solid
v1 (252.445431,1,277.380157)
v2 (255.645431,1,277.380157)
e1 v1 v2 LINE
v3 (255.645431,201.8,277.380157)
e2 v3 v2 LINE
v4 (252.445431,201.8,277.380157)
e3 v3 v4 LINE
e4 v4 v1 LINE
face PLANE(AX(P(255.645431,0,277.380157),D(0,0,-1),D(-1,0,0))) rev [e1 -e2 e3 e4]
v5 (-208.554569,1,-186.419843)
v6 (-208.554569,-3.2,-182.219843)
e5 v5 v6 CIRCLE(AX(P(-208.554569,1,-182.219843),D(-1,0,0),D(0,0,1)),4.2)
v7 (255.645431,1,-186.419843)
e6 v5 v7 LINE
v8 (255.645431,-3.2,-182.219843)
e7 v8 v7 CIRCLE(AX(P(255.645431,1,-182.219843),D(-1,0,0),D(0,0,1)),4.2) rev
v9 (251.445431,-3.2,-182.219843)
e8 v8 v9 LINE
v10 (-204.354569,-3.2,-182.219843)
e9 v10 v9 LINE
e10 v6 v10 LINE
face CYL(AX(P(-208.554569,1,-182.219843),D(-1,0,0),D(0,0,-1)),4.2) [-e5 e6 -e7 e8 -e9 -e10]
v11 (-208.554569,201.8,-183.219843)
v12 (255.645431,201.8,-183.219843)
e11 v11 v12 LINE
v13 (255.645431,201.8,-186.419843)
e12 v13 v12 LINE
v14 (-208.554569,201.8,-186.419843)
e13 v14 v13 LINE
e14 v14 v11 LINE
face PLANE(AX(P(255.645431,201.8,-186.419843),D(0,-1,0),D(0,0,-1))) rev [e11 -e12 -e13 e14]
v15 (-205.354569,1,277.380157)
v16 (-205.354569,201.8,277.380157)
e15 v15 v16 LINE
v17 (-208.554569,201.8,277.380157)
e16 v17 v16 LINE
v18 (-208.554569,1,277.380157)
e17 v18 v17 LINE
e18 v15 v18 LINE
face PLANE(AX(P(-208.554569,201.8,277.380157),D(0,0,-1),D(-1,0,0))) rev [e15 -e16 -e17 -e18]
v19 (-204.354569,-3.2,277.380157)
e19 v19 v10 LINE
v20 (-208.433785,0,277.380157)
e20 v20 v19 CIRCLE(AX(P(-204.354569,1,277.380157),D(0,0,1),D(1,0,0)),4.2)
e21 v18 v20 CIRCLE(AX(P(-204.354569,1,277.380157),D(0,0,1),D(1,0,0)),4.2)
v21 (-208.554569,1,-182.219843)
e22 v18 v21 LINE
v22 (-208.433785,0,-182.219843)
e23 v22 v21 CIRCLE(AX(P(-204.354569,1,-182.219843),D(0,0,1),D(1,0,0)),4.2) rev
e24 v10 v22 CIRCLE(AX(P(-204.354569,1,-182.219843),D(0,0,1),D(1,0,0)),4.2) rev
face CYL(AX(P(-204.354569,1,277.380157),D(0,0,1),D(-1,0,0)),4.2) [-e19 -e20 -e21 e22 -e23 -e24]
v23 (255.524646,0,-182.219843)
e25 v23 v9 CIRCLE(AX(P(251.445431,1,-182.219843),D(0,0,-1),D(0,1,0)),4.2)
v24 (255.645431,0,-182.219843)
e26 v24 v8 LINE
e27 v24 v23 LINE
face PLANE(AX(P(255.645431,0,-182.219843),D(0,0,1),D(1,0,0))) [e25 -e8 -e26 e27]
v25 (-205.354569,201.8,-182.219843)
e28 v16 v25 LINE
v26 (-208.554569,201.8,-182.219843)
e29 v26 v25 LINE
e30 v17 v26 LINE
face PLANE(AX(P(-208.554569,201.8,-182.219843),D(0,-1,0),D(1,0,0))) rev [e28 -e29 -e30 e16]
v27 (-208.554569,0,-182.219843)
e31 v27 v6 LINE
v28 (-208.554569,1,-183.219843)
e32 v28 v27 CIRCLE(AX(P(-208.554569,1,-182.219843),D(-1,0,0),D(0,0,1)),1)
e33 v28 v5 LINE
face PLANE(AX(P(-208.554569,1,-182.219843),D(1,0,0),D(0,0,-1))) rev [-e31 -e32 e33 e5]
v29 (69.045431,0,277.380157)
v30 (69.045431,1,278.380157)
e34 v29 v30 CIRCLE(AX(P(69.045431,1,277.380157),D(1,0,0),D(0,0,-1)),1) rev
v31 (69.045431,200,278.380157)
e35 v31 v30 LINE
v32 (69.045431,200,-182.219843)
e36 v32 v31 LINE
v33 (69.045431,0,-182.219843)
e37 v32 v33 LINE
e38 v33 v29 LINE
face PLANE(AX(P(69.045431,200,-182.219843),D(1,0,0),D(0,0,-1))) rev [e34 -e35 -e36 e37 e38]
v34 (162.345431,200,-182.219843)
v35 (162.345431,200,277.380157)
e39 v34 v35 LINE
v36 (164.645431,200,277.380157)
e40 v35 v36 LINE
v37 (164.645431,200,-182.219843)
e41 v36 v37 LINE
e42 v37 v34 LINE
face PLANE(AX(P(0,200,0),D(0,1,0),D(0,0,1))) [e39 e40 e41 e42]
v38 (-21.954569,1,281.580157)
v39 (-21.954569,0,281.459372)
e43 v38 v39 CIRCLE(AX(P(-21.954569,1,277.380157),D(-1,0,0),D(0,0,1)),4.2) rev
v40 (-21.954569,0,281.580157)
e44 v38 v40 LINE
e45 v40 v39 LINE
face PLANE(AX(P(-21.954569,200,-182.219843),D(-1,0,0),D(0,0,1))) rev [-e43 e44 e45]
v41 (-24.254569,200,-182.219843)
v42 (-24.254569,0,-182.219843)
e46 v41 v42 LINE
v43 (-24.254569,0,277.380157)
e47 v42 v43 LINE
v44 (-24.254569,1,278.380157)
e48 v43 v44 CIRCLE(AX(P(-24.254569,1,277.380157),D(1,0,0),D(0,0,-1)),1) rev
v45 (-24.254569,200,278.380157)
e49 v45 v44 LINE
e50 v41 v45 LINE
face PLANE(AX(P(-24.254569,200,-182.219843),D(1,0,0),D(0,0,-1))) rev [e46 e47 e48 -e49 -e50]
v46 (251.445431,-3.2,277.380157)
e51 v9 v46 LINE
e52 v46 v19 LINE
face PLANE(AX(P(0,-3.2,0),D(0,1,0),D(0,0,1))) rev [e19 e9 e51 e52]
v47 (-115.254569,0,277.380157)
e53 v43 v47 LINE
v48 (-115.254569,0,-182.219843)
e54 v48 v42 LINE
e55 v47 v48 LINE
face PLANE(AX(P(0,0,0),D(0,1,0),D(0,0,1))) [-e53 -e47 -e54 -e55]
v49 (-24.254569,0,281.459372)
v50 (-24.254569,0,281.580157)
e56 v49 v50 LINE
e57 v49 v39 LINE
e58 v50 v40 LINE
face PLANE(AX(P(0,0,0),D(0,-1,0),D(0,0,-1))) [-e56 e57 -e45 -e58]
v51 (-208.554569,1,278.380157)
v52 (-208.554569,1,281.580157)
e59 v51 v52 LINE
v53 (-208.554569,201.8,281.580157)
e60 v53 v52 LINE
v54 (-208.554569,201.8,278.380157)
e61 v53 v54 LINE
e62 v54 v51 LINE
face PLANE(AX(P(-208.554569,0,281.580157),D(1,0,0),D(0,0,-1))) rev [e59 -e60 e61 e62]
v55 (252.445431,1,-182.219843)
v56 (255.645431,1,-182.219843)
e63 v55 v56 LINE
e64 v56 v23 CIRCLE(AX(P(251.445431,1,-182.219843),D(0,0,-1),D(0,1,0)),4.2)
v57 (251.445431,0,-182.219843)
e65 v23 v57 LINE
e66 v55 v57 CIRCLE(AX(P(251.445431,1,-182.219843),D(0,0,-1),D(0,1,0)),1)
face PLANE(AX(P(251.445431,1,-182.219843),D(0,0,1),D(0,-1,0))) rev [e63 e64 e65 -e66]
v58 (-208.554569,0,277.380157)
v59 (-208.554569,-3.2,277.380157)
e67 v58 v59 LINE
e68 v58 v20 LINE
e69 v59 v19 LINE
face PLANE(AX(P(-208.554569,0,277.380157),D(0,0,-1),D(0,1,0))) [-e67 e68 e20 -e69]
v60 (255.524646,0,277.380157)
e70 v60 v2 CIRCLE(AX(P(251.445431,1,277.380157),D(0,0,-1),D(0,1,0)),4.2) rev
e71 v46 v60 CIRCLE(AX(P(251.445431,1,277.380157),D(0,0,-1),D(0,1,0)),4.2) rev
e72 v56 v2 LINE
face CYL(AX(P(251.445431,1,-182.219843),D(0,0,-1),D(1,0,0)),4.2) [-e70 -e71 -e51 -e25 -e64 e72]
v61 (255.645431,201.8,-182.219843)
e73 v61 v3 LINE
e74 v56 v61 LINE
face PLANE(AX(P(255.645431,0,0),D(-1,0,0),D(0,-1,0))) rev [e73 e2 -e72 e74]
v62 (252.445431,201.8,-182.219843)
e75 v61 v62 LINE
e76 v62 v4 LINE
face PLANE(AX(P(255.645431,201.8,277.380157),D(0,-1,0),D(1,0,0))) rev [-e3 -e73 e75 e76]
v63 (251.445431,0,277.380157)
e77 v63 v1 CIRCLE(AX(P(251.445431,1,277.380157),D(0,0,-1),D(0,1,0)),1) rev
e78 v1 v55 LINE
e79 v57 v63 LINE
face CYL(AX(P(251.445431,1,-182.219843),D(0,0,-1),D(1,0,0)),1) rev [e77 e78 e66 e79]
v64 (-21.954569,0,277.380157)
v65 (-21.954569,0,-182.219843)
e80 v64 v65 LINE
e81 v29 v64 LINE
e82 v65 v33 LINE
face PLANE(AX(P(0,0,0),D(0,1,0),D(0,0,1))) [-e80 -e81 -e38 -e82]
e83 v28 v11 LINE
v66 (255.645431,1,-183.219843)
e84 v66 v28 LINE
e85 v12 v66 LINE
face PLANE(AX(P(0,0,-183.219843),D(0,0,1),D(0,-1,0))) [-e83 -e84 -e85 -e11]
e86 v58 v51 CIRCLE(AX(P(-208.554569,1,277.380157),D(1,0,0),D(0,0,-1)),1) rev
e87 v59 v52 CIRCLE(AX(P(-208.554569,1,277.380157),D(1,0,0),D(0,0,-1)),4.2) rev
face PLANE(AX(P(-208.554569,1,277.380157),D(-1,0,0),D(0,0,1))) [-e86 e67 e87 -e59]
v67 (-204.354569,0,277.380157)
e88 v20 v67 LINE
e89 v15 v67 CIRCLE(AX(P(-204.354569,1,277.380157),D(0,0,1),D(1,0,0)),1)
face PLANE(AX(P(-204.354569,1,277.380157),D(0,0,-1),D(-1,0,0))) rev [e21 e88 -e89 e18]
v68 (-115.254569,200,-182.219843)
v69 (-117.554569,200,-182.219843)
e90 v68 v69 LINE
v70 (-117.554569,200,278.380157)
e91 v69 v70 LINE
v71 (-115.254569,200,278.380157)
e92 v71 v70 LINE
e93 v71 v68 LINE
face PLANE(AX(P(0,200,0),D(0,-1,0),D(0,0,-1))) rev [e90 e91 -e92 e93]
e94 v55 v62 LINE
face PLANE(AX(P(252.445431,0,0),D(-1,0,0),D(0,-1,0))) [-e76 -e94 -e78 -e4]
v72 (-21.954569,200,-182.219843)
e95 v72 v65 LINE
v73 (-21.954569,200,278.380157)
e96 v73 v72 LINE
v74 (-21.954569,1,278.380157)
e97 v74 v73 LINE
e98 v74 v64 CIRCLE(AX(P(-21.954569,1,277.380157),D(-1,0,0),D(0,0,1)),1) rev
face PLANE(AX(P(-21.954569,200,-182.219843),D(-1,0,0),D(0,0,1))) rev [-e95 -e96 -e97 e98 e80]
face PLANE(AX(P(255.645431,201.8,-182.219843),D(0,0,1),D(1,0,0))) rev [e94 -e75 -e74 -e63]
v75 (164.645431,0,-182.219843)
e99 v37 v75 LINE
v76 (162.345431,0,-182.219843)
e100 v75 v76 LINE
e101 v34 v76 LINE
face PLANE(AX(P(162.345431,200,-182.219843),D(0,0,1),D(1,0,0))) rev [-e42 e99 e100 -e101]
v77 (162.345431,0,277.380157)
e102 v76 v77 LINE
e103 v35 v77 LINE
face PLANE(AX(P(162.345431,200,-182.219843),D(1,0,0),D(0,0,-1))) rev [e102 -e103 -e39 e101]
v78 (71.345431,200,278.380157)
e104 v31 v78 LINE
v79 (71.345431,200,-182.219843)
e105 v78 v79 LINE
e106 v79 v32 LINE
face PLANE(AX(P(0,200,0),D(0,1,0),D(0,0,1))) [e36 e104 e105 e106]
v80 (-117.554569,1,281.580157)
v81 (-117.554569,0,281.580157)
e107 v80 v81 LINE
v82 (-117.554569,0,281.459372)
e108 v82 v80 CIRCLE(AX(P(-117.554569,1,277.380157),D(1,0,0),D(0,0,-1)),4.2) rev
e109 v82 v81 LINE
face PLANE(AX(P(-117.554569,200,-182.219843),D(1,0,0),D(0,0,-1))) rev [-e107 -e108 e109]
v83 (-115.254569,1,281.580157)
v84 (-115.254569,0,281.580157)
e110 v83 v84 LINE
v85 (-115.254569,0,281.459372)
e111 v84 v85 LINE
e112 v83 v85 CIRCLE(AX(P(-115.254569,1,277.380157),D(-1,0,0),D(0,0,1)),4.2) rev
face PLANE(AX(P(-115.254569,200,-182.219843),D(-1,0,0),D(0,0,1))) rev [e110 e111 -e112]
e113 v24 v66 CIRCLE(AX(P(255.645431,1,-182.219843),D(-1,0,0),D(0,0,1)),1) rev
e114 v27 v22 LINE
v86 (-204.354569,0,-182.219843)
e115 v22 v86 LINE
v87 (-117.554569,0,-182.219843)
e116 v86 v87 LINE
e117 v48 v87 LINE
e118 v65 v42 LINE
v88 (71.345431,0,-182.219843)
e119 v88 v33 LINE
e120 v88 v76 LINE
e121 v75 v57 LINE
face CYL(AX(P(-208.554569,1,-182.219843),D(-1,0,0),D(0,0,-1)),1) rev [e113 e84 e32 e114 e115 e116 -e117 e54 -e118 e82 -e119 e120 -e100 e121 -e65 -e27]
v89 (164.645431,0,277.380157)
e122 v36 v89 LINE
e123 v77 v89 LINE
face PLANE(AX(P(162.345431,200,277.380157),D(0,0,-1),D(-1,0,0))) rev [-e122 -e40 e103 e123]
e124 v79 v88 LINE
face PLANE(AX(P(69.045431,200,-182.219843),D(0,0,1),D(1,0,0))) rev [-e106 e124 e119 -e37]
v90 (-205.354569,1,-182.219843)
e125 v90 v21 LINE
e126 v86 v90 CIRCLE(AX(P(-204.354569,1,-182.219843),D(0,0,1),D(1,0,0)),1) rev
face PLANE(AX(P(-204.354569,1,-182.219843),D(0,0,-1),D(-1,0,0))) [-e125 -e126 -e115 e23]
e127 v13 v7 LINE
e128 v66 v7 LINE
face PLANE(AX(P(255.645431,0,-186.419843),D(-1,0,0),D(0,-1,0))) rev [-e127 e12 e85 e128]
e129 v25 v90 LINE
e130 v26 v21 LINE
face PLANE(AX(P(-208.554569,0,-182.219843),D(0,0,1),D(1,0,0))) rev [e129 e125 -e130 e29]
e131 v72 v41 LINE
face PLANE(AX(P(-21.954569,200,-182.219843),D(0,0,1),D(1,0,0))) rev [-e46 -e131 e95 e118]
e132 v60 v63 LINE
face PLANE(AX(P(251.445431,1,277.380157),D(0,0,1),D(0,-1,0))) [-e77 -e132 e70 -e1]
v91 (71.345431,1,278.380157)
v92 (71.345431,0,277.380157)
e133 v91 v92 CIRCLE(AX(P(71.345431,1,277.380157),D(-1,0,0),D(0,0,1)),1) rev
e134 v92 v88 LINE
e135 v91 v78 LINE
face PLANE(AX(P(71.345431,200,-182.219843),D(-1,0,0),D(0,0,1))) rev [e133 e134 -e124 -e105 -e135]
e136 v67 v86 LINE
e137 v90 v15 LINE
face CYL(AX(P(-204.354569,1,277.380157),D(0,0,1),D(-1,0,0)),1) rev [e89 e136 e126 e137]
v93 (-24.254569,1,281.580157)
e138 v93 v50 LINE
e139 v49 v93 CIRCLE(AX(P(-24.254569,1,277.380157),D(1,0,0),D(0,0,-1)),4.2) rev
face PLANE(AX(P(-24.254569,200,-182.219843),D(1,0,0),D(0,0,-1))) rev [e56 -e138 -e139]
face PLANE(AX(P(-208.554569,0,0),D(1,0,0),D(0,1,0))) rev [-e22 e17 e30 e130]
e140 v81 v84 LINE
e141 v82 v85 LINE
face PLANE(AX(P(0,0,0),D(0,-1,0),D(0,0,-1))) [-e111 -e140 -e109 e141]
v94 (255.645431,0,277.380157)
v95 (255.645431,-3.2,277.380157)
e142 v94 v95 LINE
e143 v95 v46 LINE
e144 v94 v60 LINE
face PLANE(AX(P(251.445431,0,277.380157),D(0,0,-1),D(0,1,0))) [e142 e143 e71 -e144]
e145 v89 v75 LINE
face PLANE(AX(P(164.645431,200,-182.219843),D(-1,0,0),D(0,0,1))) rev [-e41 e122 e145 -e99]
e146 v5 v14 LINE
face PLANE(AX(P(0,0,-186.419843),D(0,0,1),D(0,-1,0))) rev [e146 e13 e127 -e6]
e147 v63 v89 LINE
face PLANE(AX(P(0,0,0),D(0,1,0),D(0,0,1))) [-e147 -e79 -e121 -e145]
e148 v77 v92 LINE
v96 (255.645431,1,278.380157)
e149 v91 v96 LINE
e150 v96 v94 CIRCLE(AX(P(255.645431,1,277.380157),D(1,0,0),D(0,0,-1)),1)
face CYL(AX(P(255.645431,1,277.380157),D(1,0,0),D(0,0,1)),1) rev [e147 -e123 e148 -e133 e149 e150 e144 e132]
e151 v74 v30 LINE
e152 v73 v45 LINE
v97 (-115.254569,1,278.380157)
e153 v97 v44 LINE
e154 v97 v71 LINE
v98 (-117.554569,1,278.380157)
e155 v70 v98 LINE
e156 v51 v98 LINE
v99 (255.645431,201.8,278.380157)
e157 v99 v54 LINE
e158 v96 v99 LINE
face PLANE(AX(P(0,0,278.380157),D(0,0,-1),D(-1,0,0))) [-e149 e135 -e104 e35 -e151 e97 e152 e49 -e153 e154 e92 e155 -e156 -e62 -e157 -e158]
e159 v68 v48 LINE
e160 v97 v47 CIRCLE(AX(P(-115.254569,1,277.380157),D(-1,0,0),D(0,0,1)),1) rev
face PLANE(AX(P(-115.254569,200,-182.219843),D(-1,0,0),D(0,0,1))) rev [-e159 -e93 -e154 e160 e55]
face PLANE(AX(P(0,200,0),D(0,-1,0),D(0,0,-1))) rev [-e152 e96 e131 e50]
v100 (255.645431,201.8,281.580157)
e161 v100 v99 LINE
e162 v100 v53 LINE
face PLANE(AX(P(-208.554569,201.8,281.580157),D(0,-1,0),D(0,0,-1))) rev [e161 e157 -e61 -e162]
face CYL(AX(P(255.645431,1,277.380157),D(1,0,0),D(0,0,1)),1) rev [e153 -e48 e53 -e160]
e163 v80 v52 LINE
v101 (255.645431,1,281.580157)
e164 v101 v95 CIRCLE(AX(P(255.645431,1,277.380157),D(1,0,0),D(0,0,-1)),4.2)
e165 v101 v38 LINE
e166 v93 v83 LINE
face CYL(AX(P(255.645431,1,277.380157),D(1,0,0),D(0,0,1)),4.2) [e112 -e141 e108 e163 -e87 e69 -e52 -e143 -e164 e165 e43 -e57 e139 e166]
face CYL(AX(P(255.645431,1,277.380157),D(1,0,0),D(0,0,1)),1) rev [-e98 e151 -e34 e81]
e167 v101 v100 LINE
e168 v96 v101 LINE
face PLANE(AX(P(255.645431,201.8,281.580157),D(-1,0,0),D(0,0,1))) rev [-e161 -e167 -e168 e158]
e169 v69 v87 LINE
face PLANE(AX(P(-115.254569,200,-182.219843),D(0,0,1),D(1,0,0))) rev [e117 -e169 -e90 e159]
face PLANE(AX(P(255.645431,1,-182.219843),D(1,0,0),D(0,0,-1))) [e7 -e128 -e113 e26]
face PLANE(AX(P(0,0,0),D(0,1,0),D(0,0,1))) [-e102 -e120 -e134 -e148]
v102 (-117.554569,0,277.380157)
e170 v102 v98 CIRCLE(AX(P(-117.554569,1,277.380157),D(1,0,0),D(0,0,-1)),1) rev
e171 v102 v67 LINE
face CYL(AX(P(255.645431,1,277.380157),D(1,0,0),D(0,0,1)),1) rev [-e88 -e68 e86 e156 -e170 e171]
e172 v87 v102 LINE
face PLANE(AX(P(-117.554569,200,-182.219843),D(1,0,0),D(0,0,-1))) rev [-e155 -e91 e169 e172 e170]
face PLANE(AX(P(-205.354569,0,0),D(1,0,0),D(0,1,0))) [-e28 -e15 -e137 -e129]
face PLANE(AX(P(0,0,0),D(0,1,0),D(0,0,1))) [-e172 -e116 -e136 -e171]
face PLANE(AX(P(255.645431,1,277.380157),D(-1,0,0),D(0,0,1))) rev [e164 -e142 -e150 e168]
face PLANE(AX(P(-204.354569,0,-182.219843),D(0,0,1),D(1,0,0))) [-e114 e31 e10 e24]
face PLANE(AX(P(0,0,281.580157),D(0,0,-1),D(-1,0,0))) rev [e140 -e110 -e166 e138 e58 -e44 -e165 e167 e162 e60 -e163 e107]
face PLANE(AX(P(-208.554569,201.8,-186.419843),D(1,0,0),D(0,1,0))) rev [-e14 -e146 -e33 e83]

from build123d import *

# Parameters (mm, degrees)
SKETCH1_W                      = 464.2
SKETCH1_H                      = 468
BASE_FLANGE1_DEPTH             = 3.2
EDGE_FLANGE1_STRIP_W           = 14.8
EDGE_FLANGE1_STRIP_H           = 3.2
EDGE_FLANGE1_STRIP_CUT_DEPTH   = 464.2
EDGE_FLANGE1_DEPTH             = 464.2
EDGE_FLANGE2_STRIP_W           = 14.8
EDGE_FLANGE2_STRIP_H           = 3.2
EDGE_FLANGE2_STRIP_CUT_DEPTH   = 464.2
EDGE_FLANGE2_DEPTH             = 464.2
SKETCH12_W                     = 2.3
SKETCH12_H                     = 459.6
SKETCH12_H_2                   = 462.8
SKETCH12_H_3                   = 463.8
BOSS_EXTRUDE1_DEPTH            = 200
EDGE_FLANGE3_STRIP_W           = 14.8
EDGE_FLANGE3_STRIP_H           = 3.2
EDGE_FLANGE3_STRIP_CUT_DEPTH   = 459.6
EDGE_FLANGE3_STRIP_2_W         = 14.8
EDGE_FLANGE3_STRIP_2_H         = 3.2
EDGE_FLANGE3_STRIP_CUT_2_DEPTH = 459.6
EDGE_FLANGE3_DEPTH             = 459.6
EDGE_FLANGE3_BEND_DEPTH        = 459.6


# Sheet-metal steps are written as plain solids
with BuildPart() as part:
    # Sketch1 → Base-Flange1 (new body)
    with BuildSketch(Plane(origin=(0, 0, 0), x_dir=(1, 0, 0), z_dir=(0, 1, 0))):
        with Locations((23.545430809, -47.580156658)):
            Rectangle(SKETCH1_W, SKETCH1_H)
    extrude(amount=-BASE_FLANGE1_DEPTH)

    # Edge-Flange1 strip (across the edge) → Edge-Flange1 strip cut (cut)
    with BuildSketch(Plane(origin=(255.645430809, 0, -186.419843342), x_dir=(0, 0, 1), z_dir=(-1, 0, 0))):
        with Locations((-3.2, -1.6)):
            Rectangle(EDGE_FLANGE1_STRIP_W, EDGE_FLANGE1_STRIP_H)
    extrude(amount=EDGE_FLANGE1_STRIP_CUT_DEPTH, mode=Mode.SUBTRACT)

    # Edge-Flange1 section (across the edge) → Edge-Flange1 (add)
    with BuildSketch(Plane(origin=(255.645430809, 0, -186.419843342), x_dir=(0, 0, 1), z_dir=(-1, 0, 0))):
        with BuildLine():
            Line((0, 1), (0, 201.8))
            Line((0, 201.8), (3.2, 201.8))
            Line((3.2, 201.8), (3.2, 1))
            ThreePointArc((3.2, 1), (3.492893219, 0.292893219), (4.2, 0))
            Line((4.2, 0), (4.2, -3.2))
            ThreePointArc((4.2, -3.2), (1.230151519, -1.969848481), (0, 1))
        make_face()
    extrude(amount=EDGE_FLANGE1_DEPTH)

    # Edge-Flange2 strip (across the edge) → Edge-Flange2 strip cut (cut)
    with BuildSketch(Plane(origin=(-208.554569191, 0, 281.580156658), x_dir=(0, 0, -1), z_dir=(1, 0, 0))):
        with Locations((-3.2, -1.6)):
            Rectangle(EDGE_FLANGE2_STRIP_W, EDGE_FLANGE2_STRIP_H)
    extrude(amount=EDGE_FLANGE2_STRIP_CUT_DEPTH, mode=Mode.SUBTRACT)

    # Edge-Flange2 section (across the edge) → Edge-Flange2 (add)
    with BuildSketch(Plane(origin=(-208.554569191, 0, 281.580156658), x_dir=(0, 0, -1), z_dir=(1, 0, 0))):
        with BuildLine():
            Line((0, 1), (0, 201.8))
            Line((0, 201.8), (3.2, 201.8))
            Line((3.2, 201.8), (3.2, 1))
            ThreePointArc((3.2, 1), (3.492893219, 0.292893219), (4.2, 0))
            Line((4.2, 0), (4.2, -3.2))
            ThreePointArc((4.2, -3.2), (1.230151519, -1.969848481), (0, 1))
        make_face()
    extrude(amount=EDGE_FLANGE2_DEPTH)

    # Sketch12 → Boss-Extrude1 (add)
    with BuildSketch(Plane(origin=(0, 0, 0), x_dir=(1, 0, 0), z_dir=(0, 1, 0))):
        with Locations((163.495430809, -47.580156658)):
            Rectangle(SKETCH12_W, SKETCH12_H)
        with Locations((70.195430809, -49.180156658)):
            Rectangle(SKETCH12_W, SKETCH12_H_2)
        with Locations((-23.104569191, -49.680156658)):
            Rectangle(SKETCH12_W, SKETCH12_H_3)
        with Locations((-116.404569191, -49.680156658)):
            Rectangle(SKETCH12_W, SKETCH12_H_3)
    extrude(amount=BOSS_EXTRUDE1_DEPTH)

    # Edge-Flange3 strip (across the edge) → Edge-Flange3 strip cut (cut)
    with BuildSketch(Plane(origin=(255.645430809, 0, 277.380156658), x_dir=(-1, 0, 0), z_dir=(0, 0, -1))):
        with Locations((-3.2, -1.6)):
            Rectangle(EDGE_FLANGE3_STRIP_W, EDGE_FLANGE3_STRIP_H)
    extrude(amount=EDGE_FLANGE3_STRIP_CUT_DEPTH, mode=Mode.SUBTRACT)

    # Edge-Flange3 strip 2 (across the edge) → Edge-Flange3 strip cut 2 (cut)
    with BuildSketch(Plane(origin=(-208.554569191, 0, -182.219843342), x_dir=(1, 0, 0), z_dir=(0, 0, 1))):
        with Locations((-3.2, -1.6)):
            Rectangle(EDGE_FLANGE3_STRIP_2_W, EDGE_FLANGE3_STRIP_2_H)
    extrude(amount=EDGE_FLANGE3_STRIP_CUT_2_DEPTH, mode=Mode.SUBTRACT)

    # Edge-Flange3 section (across the edge) → Edge-Flange3 (add)
    with BuildSketch(Plane(origin=(255.645430809, 0, 277.380156658), x_dir=(-1, 0, 0), z_dir=(0, 0, -1))):
        with BuildLine():
            Line((0, 1), (0, 201.8))
            Line((0, 201.8), (3.2, 201.8))
            Line((3.2, 201.8), (3.2, 1))
            ThreePointArc((3.2, 1), (3.492893219, 0.292893219), (4.2, 0))
            Line((4.2, 0), (4.2, -3.2))
            ThreePointArc((4.2, -3.2), (1.230151519, -1.969848481), (0, 1))
        make_face()
    extrude(amount=EDGE_FLANGE3_DEPTH)

    # Edge-Flange3 section 2 (across the edge) → Edge-Flange3 bend (add)
    with BuildSketch(Plane(origin=(-208.554569191, 0, -182.219843342), x_dir=(1, 0, 0), z_dir=(0, 0, 1))):
        with BuildLine():
            Line((0, 1), (0, 201.8))
            Line((0, 201.8), (3.2, 201.8))
            Line((3.2, 201.8), (3.2, 1))
            ThreePointArc((3.2, 1), (3.492893219, 0.292893219), (4.2, 0))
            Line((4.2, 0), (4.2, -3.2))
            ThreePointArc((4.2, -3.2), (1.230151519, -1.969848481), (0, 1))
        make_face()
    extrude(amount=EDGE_FLANGE3_BEND_DEPTH)


solid = part.part
